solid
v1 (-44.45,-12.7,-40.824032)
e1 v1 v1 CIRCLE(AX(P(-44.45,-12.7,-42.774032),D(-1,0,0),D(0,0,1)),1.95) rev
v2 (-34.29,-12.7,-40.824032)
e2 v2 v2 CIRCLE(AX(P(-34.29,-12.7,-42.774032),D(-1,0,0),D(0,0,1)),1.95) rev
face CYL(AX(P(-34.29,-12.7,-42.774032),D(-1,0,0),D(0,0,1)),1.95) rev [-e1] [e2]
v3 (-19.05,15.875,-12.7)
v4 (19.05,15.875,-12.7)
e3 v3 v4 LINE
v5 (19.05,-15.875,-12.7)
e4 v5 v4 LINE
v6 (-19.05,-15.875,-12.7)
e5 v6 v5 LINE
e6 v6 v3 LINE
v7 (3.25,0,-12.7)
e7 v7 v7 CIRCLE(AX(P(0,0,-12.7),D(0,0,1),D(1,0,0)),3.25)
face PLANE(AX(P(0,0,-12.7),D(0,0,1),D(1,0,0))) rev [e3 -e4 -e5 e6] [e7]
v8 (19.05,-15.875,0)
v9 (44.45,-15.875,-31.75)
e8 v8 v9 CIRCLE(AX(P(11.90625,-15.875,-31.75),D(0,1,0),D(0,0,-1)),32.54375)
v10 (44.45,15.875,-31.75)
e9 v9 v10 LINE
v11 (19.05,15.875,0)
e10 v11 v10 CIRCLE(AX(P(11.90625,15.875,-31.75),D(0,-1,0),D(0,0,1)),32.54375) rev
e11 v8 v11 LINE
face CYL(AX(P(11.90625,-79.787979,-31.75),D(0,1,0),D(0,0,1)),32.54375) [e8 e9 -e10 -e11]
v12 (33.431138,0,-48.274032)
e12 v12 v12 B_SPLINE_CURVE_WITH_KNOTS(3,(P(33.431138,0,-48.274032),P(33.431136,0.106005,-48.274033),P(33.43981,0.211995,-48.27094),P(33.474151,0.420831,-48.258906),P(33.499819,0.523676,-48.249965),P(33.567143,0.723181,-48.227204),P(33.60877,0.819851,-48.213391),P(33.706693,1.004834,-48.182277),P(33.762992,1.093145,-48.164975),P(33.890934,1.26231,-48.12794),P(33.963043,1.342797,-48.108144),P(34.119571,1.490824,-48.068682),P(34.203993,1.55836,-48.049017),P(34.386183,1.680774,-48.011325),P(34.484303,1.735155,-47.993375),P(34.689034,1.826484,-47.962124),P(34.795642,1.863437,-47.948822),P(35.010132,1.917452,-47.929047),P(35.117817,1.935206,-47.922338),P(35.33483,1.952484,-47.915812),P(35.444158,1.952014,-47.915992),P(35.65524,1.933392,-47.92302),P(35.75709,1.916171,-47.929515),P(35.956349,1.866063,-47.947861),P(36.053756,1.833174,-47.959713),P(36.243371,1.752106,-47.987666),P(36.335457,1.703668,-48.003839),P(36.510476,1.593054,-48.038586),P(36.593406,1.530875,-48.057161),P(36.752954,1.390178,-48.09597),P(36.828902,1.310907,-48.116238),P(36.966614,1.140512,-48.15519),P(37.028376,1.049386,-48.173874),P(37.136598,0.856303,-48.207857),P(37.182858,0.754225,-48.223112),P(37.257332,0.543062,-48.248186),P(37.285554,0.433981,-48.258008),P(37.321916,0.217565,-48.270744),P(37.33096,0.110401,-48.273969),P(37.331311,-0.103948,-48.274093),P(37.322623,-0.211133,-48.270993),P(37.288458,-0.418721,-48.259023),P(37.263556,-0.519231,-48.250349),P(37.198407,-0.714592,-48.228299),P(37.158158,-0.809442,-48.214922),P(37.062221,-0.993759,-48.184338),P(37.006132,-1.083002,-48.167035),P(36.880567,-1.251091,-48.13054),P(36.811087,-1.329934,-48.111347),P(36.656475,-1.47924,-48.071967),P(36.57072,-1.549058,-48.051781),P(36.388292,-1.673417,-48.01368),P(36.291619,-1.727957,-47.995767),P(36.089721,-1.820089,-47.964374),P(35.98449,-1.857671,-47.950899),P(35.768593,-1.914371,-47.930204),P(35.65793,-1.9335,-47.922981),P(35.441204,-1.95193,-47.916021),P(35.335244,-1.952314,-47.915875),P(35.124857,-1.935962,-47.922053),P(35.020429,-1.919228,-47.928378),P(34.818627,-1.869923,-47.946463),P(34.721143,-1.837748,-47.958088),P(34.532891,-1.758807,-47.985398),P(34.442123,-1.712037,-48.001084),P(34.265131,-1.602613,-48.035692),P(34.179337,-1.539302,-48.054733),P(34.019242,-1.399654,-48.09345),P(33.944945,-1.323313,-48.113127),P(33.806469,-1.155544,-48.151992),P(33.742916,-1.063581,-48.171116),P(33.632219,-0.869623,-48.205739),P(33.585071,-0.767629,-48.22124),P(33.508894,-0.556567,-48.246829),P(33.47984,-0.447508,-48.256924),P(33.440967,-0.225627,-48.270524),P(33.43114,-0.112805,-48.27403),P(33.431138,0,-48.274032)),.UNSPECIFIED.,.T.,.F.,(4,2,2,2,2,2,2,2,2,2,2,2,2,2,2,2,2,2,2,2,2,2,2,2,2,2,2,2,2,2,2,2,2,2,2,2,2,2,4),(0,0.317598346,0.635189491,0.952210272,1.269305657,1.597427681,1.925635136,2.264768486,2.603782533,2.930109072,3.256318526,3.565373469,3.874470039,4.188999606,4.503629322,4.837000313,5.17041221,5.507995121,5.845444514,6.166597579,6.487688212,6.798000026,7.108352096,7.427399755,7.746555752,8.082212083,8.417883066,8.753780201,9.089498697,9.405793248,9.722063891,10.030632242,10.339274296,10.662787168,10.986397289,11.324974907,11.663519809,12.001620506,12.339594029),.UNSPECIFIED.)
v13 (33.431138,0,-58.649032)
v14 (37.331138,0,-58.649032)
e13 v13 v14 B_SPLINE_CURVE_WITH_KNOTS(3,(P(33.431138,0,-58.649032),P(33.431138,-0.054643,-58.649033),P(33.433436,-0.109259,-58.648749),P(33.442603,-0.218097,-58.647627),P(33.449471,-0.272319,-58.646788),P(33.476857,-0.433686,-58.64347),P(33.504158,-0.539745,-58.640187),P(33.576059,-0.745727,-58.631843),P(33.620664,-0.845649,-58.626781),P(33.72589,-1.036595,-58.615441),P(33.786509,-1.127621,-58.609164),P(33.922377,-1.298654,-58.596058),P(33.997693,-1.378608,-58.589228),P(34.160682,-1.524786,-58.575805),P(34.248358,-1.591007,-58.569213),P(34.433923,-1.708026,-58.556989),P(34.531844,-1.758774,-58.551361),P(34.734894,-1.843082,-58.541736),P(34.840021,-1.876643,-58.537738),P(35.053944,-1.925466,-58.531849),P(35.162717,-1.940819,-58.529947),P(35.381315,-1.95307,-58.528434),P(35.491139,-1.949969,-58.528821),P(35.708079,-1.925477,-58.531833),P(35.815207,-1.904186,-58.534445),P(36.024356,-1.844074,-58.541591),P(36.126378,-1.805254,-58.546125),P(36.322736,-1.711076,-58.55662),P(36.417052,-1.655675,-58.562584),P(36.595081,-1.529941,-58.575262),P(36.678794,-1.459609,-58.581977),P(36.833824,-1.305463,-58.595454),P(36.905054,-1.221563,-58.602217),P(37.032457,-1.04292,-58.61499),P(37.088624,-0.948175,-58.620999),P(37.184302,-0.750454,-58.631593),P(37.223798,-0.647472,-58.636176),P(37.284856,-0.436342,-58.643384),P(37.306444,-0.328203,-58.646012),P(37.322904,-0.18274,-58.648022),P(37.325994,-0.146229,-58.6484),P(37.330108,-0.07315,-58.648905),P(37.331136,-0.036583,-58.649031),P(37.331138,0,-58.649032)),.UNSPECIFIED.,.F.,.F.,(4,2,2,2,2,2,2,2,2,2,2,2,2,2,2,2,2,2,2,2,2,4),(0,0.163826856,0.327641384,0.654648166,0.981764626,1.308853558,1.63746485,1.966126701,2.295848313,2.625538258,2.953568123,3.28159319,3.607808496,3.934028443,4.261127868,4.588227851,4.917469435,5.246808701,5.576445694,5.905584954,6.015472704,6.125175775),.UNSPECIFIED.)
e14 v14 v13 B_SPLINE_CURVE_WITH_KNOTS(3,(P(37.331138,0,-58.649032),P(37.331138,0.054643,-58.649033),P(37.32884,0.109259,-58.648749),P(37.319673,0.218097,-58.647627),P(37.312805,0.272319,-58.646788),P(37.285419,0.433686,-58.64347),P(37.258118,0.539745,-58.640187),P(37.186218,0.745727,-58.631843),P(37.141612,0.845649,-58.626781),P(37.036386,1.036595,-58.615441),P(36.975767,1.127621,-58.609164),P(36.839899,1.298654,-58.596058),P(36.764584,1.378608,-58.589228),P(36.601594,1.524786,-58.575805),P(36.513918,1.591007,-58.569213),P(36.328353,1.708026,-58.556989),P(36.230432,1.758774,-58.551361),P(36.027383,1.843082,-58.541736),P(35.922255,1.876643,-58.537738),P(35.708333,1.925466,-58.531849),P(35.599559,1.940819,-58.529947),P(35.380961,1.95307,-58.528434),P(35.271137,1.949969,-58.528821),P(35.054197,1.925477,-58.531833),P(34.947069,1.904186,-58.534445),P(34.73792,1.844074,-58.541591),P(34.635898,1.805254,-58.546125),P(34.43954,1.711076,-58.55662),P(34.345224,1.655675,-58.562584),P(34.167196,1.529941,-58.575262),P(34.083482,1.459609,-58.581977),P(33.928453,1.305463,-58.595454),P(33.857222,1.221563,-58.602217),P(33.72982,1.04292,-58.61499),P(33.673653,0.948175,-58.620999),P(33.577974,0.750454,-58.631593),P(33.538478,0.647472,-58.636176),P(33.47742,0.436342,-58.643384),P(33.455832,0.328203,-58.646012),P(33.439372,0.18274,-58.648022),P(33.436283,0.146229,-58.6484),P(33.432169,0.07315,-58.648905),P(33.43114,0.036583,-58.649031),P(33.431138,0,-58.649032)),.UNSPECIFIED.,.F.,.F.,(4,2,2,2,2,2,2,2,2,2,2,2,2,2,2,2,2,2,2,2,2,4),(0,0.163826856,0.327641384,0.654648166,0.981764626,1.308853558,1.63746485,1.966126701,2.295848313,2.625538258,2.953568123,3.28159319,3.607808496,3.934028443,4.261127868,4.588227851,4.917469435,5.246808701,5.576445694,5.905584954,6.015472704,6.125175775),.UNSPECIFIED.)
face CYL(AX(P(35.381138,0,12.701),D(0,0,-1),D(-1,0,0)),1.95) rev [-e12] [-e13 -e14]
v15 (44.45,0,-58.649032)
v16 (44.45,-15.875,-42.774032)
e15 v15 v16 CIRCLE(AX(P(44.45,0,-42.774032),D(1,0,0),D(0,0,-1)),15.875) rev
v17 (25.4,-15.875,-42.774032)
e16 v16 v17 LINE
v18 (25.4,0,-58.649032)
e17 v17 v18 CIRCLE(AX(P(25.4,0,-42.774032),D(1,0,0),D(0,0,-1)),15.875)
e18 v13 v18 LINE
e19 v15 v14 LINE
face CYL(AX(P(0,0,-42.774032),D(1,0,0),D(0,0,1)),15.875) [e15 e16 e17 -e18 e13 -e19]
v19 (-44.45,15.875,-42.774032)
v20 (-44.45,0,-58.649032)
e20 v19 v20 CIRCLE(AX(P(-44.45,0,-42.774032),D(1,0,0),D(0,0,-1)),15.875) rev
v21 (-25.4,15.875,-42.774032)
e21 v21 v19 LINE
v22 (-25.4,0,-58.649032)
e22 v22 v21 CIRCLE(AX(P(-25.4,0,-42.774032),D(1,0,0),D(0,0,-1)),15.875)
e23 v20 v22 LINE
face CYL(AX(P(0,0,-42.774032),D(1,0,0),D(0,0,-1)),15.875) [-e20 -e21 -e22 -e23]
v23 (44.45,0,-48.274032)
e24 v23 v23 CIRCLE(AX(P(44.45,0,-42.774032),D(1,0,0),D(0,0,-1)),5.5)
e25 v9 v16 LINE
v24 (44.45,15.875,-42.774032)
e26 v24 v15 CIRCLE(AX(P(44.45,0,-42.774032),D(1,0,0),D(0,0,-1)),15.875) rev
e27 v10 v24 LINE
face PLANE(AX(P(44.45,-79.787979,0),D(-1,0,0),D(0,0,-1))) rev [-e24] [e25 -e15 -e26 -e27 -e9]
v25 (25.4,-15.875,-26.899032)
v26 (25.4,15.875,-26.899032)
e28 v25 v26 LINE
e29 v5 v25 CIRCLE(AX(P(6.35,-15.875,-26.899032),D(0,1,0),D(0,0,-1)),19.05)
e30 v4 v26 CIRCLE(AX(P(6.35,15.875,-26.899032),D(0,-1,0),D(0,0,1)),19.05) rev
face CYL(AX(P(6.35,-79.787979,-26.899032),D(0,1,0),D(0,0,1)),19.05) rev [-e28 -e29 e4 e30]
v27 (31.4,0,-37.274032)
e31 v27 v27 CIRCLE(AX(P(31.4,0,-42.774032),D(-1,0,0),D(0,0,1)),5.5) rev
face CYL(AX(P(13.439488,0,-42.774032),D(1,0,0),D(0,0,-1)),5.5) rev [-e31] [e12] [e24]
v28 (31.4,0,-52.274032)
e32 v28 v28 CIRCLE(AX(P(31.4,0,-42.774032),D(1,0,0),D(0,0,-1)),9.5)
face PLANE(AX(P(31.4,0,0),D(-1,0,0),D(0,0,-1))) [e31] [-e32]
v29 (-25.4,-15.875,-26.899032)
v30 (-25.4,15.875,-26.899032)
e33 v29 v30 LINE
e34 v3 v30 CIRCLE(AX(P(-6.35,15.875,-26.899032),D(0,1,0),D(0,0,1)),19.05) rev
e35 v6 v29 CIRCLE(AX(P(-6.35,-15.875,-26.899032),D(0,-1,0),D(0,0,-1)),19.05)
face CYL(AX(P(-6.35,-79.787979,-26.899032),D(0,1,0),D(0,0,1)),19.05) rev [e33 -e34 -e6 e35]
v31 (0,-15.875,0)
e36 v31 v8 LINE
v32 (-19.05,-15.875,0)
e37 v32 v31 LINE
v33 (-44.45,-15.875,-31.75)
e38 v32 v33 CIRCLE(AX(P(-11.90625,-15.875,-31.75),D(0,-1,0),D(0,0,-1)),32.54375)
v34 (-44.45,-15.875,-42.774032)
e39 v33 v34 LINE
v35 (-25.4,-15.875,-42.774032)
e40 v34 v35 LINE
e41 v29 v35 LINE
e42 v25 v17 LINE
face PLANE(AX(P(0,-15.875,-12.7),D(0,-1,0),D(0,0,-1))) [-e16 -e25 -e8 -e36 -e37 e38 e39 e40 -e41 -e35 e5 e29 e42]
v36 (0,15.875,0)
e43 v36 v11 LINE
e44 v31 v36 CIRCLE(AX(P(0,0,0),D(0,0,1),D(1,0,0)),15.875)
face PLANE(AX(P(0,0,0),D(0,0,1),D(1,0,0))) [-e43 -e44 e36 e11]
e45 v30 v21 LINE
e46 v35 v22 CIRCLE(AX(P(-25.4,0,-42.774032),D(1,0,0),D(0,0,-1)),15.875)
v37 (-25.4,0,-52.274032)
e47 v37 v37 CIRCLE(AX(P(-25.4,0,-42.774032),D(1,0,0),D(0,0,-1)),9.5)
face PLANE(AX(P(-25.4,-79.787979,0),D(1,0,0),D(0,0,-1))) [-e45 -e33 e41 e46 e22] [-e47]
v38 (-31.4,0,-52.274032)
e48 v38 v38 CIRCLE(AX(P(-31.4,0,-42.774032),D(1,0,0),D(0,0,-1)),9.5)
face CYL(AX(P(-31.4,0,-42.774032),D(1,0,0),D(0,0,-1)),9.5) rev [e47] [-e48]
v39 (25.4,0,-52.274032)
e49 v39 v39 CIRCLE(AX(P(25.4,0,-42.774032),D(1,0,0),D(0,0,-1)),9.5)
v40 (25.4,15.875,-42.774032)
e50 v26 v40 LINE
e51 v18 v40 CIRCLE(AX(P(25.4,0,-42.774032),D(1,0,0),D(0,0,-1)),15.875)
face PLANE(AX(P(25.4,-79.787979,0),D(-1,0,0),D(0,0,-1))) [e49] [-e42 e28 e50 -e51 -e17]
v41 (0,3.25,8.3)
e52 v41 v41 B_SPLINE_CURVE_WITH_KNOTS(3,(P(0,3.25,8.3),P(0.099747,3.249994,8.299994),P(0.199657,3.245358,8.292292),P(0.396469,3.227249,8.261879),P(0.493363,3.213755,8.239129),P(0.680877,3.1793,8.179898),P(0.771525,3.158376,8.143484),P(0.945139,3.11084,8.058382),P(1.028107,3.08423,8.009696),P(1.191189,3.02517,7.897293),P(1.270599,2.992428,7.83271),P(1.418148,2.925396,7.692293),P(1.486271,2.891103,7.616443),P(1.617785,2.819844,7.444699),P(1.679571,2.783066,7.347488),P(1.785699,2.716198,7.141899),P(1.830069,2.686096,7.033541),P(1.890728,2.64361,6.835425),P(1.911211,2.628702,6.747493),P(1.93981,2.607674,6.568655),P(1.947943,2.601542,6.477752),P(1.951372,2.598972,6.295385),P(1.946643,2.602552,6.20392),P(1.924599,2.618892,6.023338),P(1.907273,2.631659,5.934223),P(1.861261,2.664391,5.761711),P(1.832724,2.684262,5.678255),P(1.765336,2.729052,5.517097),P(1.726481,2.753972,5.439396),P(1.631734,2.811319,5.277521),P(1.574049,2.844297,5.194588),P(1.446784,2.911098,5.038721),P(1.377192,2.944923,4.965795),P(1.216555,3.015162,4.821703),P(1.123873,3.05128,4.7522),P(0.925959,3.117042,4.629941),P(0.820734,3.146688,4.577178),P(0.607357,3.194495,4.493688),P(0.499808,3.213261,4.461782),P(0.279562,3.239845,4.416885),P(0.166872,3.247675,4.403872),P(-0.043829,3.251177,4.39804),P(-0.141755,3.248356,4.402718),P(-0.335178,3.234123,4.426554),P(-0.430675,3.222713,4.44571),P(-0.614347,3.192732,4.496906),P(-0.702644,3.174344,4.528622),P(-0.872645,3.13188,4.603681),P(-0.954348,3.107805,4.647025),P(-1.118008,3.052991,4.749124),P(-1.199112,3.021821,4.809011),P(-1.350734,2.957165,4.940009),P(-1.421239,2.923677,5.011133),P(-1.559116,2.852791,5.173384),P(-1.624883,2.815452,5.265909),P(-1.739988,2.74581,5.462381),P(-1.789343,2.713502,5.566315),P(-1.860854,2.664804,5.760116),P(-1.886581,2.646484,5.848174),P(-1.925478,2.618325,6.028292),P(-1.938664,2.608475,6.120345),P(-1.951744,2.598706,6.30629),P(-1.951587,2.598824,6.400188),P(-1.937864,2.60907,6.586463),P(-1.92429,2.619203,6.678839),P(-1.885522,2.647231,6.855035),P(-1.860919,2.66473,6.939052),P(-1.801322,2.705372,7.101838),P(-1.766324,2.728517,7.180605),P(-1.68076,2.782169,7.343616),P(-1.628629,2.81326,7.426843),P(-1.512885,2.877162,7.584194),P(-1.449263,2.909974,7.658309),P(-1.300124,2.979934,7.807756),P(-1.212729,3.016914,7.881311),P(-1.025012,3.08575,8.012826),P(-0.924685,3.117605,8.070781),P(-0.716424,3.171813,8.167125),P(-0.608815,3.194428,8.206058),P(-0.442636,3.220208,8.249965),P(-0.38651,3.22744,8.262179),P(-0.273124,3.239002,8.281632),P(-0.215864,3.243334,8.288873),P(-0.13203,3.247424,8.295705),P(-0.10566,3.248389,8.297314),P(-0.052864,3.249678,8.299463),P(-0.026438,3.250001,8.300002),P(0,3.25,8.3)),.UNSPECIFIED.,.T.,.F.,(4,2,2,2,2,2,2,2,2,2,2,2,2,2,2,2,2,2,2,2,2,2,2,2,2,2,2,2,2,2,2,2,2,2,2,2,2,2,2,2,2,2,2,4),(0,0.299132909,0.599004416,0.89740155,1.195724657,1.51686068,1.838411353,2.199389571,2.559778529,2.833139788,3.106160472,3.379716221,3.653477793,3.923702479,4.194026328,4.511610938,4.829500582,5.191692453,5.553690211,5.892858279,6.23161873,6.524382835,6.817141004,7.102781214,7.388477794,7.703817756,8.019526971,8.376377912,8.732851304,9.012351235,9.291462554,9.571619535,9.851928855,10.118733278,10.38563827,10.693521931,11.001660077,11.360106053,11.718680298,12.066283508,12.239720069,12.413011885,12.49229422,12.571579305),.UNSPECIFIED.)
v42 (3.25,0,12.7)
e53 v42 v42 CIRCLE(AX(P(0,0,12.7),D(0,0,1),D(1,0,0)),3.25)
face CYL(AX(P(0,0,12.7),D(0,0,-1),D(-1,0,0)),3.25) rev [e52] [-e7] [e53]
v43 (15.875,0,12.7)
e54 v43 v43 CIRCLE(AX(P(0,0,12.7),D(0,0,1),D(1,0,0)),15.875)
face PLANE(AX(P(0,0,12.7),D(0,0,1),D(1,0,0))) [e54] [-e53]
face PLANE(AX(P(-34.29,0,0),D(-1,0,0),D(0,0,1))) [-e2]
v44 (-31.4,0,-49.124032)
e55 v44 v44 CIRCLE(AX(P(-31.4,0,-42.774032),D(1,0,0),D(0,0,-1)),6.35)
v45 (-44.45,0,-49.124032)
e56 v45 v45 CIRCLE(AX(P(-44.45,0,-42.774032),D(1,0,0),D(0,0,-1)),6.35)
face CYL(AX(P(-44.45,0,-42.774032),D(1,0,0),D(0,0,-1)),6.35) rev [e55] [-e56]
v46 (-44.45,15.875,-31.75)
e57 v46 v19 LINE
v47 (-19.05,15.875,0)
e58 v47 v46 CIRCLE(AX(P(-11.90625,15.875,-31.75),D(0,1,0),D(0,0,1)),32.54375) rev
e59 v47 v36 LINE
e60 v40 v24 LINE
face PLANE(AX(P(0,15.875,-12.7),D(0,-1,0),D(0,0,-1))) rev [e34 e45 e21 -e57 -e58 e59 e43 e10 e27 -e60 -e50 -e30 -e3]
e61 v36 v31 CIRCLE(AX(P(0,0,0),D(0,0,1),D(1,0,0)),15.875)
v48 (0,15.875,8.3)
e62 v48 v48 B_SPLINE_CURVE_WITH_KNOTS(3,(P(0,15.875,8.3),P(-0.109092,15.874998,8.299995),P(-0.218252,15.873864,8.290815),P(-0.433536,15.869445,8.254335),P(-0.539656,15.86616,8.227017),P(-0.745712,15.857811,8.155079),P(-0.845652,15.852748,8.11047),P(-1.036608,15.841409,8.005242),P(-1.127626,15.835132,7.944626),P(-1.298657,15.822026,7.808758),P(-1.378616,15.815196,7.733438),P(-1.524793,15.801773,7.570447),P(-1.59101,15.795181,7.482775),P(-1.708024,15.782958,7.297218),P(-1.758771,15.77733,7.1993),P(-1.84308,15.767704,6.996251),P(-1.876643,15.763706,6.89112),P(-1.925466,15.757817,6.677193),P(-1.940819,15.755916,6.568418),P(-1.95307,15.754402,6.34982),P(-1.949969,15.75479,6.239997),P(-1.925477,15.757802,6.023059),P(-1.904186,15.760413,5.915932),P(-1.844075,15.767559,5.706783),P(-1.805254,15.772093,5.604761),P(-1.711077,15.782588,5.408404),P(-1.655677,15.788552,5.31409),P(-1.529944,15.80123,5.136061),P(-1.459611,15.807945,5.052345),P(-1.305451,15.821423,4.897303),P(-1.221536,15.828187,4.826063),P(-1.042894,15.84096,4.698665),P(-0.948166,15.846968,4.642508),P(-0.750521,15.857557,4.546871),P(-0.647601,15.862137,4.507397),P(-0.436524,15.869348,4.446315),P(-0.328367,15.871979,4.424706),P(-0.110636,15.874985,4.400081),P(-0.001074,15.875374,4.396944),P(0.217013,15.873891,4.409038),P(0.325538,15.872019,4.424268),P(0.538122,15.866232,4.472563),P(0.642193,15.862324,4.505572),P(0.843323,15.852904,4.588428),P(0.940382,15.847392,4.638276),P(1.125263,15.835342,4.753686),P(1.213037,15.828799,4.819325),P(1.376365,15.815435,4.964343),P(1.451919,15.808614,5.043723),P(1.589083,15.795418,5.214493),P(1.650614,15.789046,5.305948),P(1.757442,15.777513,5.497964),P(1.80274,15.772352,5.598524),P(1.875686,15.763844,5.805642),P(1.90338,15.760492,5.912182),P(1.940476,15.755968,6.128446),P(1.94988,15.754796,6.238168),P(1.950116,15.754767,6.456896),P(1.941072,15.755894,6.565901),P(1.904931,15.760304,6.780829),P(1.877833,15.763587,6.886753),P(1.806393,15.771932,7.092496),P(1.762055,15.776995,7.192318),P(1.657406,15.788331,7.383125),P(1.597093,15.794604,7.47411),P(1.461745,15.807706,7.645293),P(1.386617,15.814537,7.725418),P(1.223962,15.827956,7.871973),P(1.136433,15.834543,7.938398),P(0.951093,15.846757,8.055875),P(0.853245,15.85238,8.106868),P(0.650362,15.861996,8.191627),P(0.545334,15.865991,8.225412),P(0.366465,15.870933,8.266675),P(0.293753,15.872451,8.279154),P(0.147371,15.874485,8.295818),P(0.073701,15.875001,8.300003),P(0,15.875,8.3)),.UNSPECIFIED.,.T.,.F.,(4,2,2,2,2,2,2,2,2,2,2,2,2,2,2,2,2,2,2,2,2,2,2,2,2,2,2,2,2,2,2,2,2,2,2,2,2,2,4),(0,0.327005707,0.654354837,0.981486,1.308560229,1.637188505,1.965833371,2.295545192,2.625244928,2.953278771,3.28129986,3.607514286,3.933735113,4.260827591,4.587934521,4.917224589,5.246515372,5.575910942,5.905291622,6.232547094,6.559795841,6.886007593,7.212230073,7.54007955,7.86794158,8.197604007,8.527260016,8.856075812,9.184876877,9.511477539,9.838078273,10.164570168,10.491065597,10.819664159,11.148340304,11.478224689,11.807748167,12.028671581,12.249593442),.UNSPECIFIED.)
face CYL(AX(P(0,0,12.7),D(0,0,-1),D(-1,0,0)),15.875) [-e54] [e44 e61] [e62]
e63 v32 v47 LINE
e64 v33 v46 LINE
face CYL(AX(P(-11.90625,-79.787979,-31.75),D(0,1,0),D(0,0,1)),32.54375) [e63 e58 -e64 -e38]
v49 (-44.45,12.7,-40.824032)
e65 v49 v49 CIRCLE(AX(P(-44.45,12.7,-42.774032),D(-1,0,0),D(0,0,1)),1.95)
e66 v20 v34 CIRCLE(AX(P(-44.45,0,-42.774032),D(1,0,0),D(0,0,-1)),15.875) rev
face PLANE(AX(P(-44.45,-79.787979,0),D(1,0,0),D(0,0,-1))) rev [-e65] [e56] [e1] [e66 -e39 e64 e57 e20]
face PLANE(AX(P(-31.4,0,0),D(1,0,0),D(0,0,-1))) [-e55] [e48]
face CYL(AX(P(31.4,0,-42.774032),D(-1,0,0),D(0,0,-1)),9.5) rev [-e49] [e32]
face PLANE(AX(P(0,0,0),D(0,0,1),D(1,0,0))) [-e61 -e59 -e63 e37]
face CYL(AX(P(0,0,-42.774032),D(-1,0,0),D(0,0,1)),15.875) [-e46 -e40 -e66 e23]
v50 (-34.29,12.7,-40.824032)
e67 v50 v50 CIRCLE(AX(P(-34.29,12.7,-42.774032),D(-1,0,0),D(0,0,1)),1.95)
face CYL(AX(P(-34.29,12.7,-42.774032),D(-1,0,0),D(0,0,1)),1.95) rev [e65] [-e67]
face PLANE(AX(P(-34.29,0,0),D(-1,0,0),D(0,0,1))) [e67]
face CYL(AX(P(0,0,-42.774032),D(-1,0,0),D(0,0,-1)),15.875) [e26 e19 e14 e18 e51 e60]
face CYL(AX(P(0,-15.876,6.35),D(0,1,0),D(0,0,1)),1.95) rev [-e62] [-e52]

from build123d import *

# Parameters (mm, degrees)
SKETCH1_R               = 15.875
SKETCH1_R_2             = 3.25
BOSS_EXTRUDE1_DEPTH     = 12.7
BOSS_EXTRUDE2_START     = -12.7
SKETCH1_3_W             = 38.1
SKETCH1_3_H             = 31.75
SKETCH1_3_R             = 3.25
BOSS_EXTRUDE2_DEPTH     = 12.7
CUT_EXTRUDE1_REACH      = 41.144
CUT_EXTRUDE1_END_RADIUS = 3.25
BOSS_EXTRUDE3_DEPTH     = 31.75
FILLET1_R               = 15.875
SKETCH8_R               = 6.35
CUT_EXTRUDE3_DEPTH      = 76.282979766
SKETCH8_3_R             = 9.5
SKETCH8_3_R_2           = 6.35
CUT_EXTRUDE4_DEPTH      = 6
SKETCH9_R               = 6.35
SKETCH9_R_2             = 5.5
BOSS_EXTRUDE4_DEPTH     = 13.05
SKETCH10_R              = 1.95
CUT_EXTRUDE5_DEPTH      = 10.16
CUT_EXTRUDE6_REACH      = 102.653
CUT_EXTRUDE6_END_RADIUS = 5.5


with BuildPart() as part:
    # Sketch1 → Boss-Extrude1 (new body)
    with BuildSketch(Plane.XY):
        Circle(SKETCH1_R)
        Circle(SKETCH1_R_2, mode=Mode.SUBTRACT)
    extrude(amount=BOSS_EXTRUDE1_DEPTH)

    # Sketch1<3> → Boss-Extrude2 (add)
    with BuildSketch(Plane.XY.offset(BOSS_EXTRUDE2_START)):
        Rectangle(SKETCH1_3_W, SKETCH1_3_H)
        Circle(SKETCH1_3_R, mode=Mode.SUBTRACT)
    extrude(amount=BOSS_EXTRUDE2_DEPTH)

    # Cut-Extrude1: up to this cylinder (the profile starts outside it)
    cut_extrude1_end = Plane(origin=(0, 0, 6.35), z_dir=(0, 0, -1)) * Cylinder(CUT_EXTRUDE1_END_RADIUS, 89.788, mode=Mode.PRIVATE)
    # Sketch4 → Cut-Extrude1 (cut, up to the surface)
    with BuildSketch(Plane(origin=(0, 15.875, 0), x_dir=(1, 0, 0), z_dir=(0, 1, 0)), mode=Mode.PRIVATE) as cut_extrude1_sk1:
        with BuildLine():
            ThreePointArc((1.95, -6.35), (1.378858223, -4.971141777), (0, -4.4))
            Line((0, -4.4), (0, -8.3))
            ThreePointArc((0, -8.3), (1.378858223, -7.728858223), (1.95, -6.35))
        make_face()
    cut_extrude1_tool1 = extrude(cut_extrude1_sk1.sketch, amount=-CUT_EXTRUDE1_REACH, mode=Mode.PRIVATE) - cut_extrude1_end
    add(cut_extrude1_tool1.solids().sort_by_distance((0.827606, 15.875, 6.35))[0], mode=Mode.SUBTRACT)
    # Sketch4 → Cut-Extrude1 (cut, up to the surface)
    with BuildSketch(Plane(origin=(0, 15.875, 0), x_dir=(1, 0, 0), z_dir=(0, 1, 0)), mode=Mode.PRIVATE) as cut_extrude1_sk2:
        with BuildLine():
            Line((0, -8.3), (0, -4.4))
            ThreePointArc((0, -4.4), (-1.95, -6.35), (0, -8.3))
        make_face()
    cut_extrude1_tool2 = extrude(cut_extrude1_sk2.sketch, amount=-CUT_EXTRUDE1_REACH, mode=Mode.PRIVATE) - cut_extrude1_end
    add(cut_extrude1_tool2.solids().sort_by_distance((-0.827606, 15.875, 6.35))[0], mode=Mode.SUBTRACT)
    # Sketch4 → Cut-Extrude1 (cut, up to the surface)
    with BuildSketch(Plane(origin=(0, 15.875, 0), x_dir=(1, 0, 0), z_dir=(0, 1, 0)), mode=Mode.PRIVATE) as cut_extrude1_sk3:
        with BuildLine():
            ThreePointArc((1.95, -6.35), (1.378858223, -4.971141777), (0, -4.4))
            Line((0, -4.4), (0, -8.3))
            ThreePointArc((0, -8.3), (1.378858223, -7.728858223), (1.95, -6.35))
        make_face()
    cut_extrude1_tool3 = extrude(cut_extrude1_sk3.sketch, amount=-CUT_EXTRUDE1_REACH, mode=Mode.PRIVATE) - cut_extrude1_end
    add(cut_extrude1_tool3.solids().sort_by_distance((0.827606, 15.875, 6.35))[0], mode=Mode.SUBTRACT)
    # Sketch4 → Cut-Extrude1 (cut, up to the surface)
    with BuildSketch(Plane(origin=(0, 15.875, 0), x_dir=(1, 0, 0), z_dir=(0, 1, 0)), mode=Mode.PRIVATE) as cut_extrude1_sk4:
        with BuildLine():
            Line((0, -8.3), (0, -4.4))
            ThreePointArc((0, -4.4), (-1.95, -6.35), (0, -8.3))
        make_face()
    cut_extrude1_tool4 = extrude(cut_extrude1_sk4.sketch, amount=-CUT_EXTRUDE1_REACH, mode=Mode.PRIVATE) - cut_extrude1_end
    add(cut_extrude1_tool4.solids().sort_by_distance((-0.827606, 15.875, 6.35))[0], mode=Mode.SUBTRACT)

    # Sketch7 → Boss-Extrude3 (add)
    with BuildSketch(Plane(origin=(0, 15.875, 0), x_dir=(1, 0, 0), z_dir=(0, 1, 0))):
        with BuildLine():
            ThreePointArc((-19.05, 12.7), (-23.740191201, 19.121901724), (-25.4, 26.899031657))
            Line((-25.4, 26.899031657), (-25.4, 58.649031657))
            Line((-25.4, 58.649031657), (-44.45, 58.649031657))
            Line((-44.45, 58.649031657), (-44.45, 31.75))
            ThreePointArc((-44.45, 31.75), (-37.318649317, 11.420080546), (-19.05, 0))
            Line((-19.05, 0), (-19.05, 12.7))
        make_face()
    extrude(amount=-BOSS_EXTRUDE3_DEPTH)

    # Fillet1
    fillet1_edges = [part.edges().sort_by_distance(p)[0] for p in [
        (-34.925, -15.875, -58.649031657),
        (-34.925, 15.875, -58.649031657),
    ]]
    fillet(fillet1_edges, radius=FILLET1_R - 0.0001)  # a hair under: the kernel refuses the full size

    # Sketch8 → Cut-Extrude3 (cut, through all)
    with BuildSketch(Plane(origin=(-25.4, 0, 0), x_dir=(0, 0, -1), z_dir=(1, 0, 0))):
        with Locations((42.774031657, 0)):
            Circle(SKETCH8_R)
    extrude(amount=-CUT_EXTRUDE3_DEPTH, mode=Mode.SUBTRACT)

    # Sketch8<3> → Cut-Extrude4 (cut)
    with BuildSketch(Plane(origin=(-25.4, 0, 0), x_dir=(0, 0, -1), z_dir=(1, 0, 0))):
        with Locations((42.774031657, 0)):
            Circle(SKETCH8_3_R)
        with Locations((42.774031657, 0)):
            Circle(SKETCH8_3_R_2, mode=Mode.SUBTRACT)
    extrude(amount=-CUT_EXTRUDE4_DEPTH, mode=Mode.SUBTRACT)

    # Mirror1: part across plane


with BuildPart() as part_1:
    add(part.part)
    add(part.part.mirror(Plane(origin=(0, 0, 0), x_dir=(0, 0, 1), z_dir=(1, 0, 0))))

    # Sketch9 → Boss-Extrude4 (add)
    with BuildSketch(Plane(origin=(44.45, 0, 0), x_dir=(0, 0, -1), z_dir=(1, 0, 0))):
        with Locations((42.774031657, 0)):
            Circle(SKETCH9_R)
        with Locations((42.774031657, 0)):
            Circle(SKETCH9_R_2, mode=Mode.SUBTRACT)
    extrude(amount=-BOSS_EXTRUDE4_DEPTH)

    # Sketch10 → Cut-Extrude5 (cut)
    with BuildSketch(Plane.ZY.offset(44.45)):
        with Locations((-42.774031657, 12.7)):
            Circle(SKETCH10_R)
        with Locations((-42.774031657, -12.7)):
            Circle(SKETCH10_R)
    extrude(amount=-CUT_EXTRUDE5_DEPTH, mode=Mode.SUBTRACT)

    # Cut-Extrude6: up to this cylinder (the profile starts outside it)
    cut_extrude6_end = Plane(origin=(35.381138, 0, -42.774031657), z_dir=(1, 0, 0)) * Cylinder(CUT_EXTRUDE6_END_RADIUS, 217.306, mode=Mode.PRIVATE)
    # Sketch11 → Cut-Extrude6 (cut, up to the surface)
    with BuildSketch(Plane.XY.offset(-76.2), mode=Mode.PRIVATE) as cut_extrude6_sk1:
        with BuildLine():
            ThreePointArc((33.431138122, 0), (35.381138122, -1.95), (37.331138122, 0))
            Line((37.331138122, 0), (33.431138122, 0))
        make_face()
    cut_extrude6_tool1 = extrude(cut_extrude6_sk1.sketch, amount=CUT_EXTRUDE6_REACH, mode=Mode.PRIVATE) - cut_extrude6_end
    add(cut_extrude6_tool1.solids().sort_by_distance((35.381138, -0.827606, -76.2))[0], mode=Mode.SUBTRACT)
    # Sketch11 → Cut-Extrude6 (cut, up to the surface)
    with BuildSketch(Plane.XY.offset(-76.2), mode=Mode.PRIVATE) as cut_extrude6_sk2:
        with BuildLine():
            Line((33.431138122, 0), (37.331138122, 0))
            ThreePointArc((37.331138122, 0), (35.381138122, 1.95), (33.431138122, 0))
        make_face()
    cut_extrude6_tool2 = extrude(cut_extrude6_sk2.sketch, amount=CUT_EXTRUDE6_REACH, mode=Mode.PRIVATE) - cut_extrude6_end
    add(cut_extrude6_tool2.solids().sort_by_distance((35.381138, 0.827606, -76.2))[0], mode=Mode.SUBTRACT)
    # Sketch11 → Cut-Extrude6 (cut, up to the surface)
    with BuildSketch(Plane.XY.offset(-76.2), mode=Mode.PRIVATE) as cut_extrude6_sk3:
        with BuildLine():
            ThreePointArc((33.431138122, 0), (35.381138122, -1.95), (37.331138122, 0))
            Line((37.331138122, 0), (33.431138122, 0))
        make_face()
    cut_extrude6_tool3 = extrude(cut_extrude6_sk3.sketch, amount=CUT_EXTRUDE6_REACH, mode=Mode.PRIVATE) - cut_extrude6_end
    add(cut_extrude6_tool3.solids().sort_by_distance((35.381138, -0.827606, -76.2))[0], mode=Mode.SUBTRACT)
    # Sketch11 → Cut-Extrude6 (cut, up to the surface)
    with BuildSketch(Plane.XY.offset(-76.2), mode=Mode.PRIVATE) as cut_extrude6_sk4:
        with BuildLine():
            Line((33.431138122, 0), (37.331138122, 0))
            ThreePointArc((37.331138122, 0), (35.381138122, 1.95), (33.431138122, 0))
        make_face()
    cut_extrude6_tool4 = extrude(cut_extrude6_sk4.sketch, amount=CUT_EXTRUDE6_REACH, mode=Mode.PRIVATE) - cut_extrude6_end
    add(cut_extrude6_tool4.solids().sort_by_distance((35.381138, 0.827606, -76.2))[0], mode=Mode.SUBTRACT)


solid = part_1.part
